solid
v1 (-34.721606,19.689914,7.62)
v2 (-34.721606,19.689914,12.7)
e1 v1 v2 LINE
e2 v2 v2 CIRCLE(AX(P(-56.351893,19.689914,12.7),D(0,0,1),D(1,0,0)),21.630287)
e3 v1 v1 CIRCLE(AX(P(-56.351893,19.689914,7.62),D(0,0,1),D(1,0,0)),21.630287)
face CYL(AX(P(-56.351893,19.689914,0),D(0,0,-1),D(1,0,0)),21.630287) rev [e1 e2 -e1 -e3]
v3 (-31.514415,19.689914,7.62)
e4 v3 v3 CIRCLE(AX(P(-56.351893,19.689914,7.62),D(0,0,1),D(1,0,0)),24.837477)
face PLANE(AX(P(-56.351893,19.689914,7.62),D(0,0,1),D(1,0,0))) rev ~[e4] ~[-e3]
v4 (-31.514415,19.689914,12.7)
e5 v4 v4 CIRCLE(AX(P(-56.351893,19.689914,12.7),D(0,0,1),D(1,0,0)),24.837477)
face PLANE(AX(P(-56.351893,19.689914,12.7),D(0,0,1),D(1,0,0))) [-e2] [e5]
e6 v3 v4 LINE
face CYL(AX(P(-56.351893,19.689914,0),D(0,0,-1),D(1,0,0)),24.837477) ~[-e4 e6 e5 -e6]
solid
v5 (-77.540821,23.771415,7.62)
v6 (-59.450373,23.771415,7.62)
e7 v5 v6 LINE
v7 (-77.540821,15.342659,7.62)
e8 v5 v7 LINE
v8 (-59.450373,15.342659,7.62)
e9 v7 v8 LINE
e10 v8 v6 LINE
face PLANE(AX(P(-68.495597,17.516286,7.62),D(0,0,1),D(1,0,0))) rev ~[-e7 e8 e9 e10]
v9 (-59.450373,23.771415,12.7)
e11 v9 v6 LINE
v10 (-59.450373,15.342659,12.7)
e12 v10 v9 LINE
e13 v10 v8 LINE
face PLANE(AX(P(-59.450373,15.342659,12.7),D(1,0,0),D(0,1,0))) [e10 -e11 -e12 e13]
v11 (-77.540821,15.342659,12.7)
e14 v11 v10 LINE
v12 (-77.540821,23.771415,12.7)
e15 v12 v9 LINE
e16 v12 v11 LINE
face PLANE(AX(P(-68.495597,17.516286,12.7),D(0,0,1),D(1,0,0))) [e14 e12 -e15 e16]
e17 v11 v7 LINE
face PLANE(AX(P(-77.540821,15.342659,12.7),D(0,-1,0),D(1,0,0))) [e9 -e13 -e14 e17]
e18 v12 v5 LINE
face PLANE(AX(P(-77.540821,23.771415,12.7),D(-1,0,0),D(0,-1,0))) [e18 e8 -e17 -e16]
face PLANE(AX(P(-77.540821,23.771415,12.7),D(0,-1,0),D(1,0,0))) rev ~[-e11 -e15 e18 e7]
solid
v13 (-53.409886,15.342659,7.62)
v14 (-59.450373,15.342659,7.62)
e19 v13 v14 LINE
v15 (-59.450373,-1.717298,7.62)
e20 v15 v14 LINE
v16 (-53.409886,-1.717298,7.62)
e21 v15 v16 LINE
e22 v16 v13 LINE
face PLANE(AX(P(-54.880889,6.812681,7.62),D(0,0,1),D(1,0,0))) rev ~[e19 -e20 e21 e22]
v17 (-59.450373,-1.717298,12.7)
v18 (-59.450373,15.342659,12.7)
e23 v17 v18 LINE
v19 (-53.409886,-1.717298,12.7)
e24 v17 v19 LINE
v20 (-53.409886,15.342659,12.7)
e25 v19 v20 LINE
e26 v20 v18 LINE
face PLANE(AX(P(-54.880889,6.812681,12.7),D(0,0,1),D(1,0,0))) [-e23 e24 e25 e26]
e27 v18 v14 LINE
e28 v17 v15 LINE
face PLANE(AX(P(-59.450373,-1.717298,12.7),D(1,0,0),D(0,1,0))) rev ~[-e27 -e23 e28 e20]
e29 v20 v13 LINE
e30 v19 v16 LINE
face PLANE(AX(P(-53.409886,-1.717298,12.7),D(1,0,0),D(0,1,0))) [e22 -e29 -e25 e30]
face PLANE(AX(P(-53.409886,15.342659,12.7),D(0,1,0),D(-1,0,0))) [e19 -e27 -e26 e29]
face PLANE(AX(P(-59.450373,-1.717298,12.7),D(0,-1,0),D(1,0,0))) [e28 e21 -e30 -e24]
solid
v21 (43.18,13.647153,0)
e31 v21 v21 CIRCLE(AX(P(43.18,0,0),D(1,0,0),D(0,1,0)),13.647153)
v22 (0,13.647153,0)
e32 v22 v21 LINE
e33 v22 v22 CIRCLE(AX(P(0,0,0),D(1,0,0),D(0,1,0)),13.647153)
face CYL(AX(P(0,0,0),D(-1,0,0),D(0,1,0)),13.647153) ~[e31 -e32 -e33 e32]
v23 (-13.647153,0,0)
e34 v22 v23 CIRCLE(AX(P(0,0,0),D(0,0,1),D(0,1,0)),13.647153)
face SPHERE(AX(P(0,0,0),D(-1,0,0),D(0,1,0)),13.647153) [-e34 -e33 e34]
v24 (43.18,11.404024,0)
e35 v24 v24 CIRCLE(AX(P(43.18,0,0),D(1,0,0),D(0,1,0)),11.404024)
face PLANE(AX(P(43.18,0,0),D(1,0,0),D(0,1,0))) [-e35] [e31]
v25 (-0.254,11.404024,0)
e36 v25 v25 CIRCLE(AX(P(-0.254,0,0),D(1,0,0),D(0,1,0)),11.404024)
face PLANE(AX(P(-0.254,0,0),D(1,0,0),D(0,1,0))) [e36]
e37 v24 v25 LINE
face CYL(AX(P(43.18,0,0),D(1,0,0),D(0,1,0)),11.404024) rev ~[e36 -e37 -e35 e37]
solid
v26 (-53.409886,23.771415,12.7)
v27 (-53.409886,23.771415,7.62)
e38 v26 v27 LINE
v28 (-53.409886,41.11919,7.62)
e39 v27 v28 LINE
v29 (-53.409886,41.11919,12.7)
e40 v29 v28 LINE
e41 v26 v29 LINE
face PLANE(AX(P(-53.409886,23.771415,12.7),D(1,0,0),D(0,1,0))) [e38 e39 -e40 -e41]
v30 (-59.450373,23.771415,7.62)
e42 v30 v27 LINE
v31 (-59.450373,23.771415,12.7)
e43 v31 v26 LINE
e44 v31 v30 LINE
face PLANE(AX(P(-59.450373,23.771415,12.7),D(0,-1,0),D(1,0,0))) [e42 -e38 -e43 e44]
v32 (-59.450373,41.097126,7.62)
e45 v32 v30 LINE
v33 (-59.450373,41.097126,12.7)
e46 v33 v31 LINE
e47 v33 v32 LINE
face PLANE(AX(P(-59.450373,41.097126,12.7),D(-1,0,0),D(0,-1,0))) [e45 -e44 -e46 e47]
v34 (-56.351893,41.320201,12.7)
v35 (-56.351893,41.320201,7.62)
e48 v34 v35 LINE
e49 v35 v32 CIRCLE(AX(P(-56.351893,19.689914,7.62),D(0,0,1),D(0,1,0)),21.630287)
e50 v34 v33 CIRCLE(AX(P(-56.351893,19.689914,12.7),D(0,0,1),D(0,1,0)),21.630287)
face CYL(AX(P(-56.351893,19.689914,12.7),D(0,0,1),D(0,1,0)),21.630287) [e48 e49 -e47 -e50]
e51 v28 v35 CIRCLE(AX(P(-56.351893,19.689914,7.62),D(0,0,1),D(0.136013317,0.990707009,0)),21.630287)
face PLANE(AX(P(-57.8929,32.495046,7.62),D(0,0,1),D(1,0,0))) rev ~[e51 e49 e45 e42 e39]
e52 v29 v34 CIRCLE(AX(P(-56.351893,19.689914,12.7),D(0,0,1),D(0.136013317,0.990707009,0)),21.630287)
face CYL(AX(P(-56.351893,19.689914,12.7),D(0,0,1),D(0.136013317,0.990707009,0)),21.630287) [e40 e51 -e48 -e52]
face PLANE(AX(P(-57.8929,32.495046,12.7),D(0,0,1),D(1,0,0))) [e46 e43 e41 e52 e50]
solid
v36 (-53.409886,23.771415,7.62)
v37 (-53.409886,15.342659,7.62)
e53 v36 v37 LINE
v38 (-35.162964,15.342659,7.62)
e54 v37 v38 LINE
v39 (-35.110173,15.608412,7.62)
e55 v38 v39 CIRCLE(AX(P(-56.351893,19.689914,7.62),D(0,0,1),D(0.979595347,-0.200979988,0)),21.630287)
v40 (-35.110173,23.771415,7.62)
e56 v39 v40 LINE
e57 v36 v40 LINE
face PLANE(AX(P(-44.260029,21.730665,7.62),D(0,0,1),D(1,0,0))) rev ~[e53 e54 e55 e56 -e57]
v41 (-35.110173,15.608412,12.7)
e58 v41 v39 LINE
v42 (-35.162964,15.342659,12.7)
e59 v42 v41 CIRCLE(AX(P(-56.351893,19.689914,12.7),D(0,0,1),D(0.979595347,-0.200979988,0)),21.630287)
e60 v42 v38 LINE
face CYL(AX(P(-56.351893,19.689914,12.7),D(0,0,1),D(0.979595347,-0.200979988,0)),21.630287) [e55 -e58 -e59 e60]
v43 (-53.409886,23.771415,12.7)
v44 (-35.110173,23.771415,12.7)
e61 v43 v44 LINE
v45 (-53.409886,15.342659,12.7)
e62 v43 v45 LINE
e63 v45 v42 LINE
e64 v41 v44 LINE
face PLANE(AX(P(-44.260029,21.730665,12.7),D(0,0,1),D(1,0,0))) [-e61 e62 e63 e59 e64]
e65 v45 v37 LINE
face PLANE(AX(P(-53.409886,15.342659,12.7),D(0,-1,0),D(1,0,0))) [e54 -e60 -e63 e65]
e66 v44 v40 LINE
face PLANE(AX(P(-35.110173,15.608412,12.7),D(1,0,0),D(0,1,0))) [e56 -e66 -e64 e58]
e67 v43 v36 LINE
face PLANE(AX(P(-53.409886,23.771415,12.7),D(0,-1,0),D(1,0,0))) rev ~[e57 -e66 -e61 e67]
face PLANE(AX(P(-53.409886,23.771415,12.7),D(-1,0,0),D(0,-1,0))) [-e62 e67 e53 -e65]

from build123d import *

# Parameters (mm, degrees)
F0_R      = 13.64715261
F1_DEPTH  = 43.18
F4_R      = 11.4040237501
F5_DEPTH  = 43.434
F6_R      = 24.8374772397
F6_R_2    = 21.6302866644
F7_DEPTH  = 12.7
F9_DEPTH  = 5.08
F8_W      = 2.942007035
F8_H      = 17.0599571333
F8_W_2    = 3.09848026
F8_W_3    = 18.0904479147
F8_H_2    = 4.3472547651
F8_H_3    = 4.0815014616
F8_W_4    = 18.2997124576
F10_DEPTH = 7.62


with BuildPart() as f1:
    # F0 (on Right) → F1 (new body)
    with BuildSketch(Plane.YZ):
        Circle(F0_R)
    extrude(amount=F1_DEPTH)

    # F2 (on Top) → F3 (revolve)
    with BuildSketch(Plane.XY):
        with BuildLine():
            Line((0, 0), (0, 13.64715261))
            ThreePointArc((0, 13.64715261), (-9.6499941544, 9.6499941544), (-13.64715261, 0))
            Line((-13.64715261, 0), (0, 0))
        make_face()
    revolve(axis=Axis((-6.823576305, 0, 0), (-1, 0, 0)))

    # F4 (on face) → F5 (cut)
    with BuildSketch(Plane.YZ.offset(43.18)):
        Circle(F4_R)
    extrude(amount=-F5_DEPTH, mode=Mode.SUBTRACT)


with BuildPart() as f7:
    # F6 (on Top) → F7 (new body)
    with BuildSketch(Plane.XY):
        with Locations((-56.3518926501, 19.6899138391)):
            Circle(F6_R)
        with Locations((-56.3518926501, 19.6899138391)):
            Circle(F6_R_2, mode=Mode.SUBTRACT)
    extrude(amount=F7_DEPTH)

    # F10 (cut): a face of the model
    f10_faces = [f7.faces().sort_by_distance(p)[0] for p in [
        (-80.4868599465, 19.6899138391, 0),
    ]]
    extrude(f10_faces, amount=-F10_DEPTH, mode=Mode.SUBTRACT)


with BuildPart() as f9:
    # F8 (on face) → F9 (new body)
    with BuildSketch(Plane.XY.offset(12.7)):
        with BuildLine():
            Line((-59.4503729101, 23.7714153007), (-56.3518926501, 23.7714153007))
            Line((-56.3518926501, 23.7714153007), (-56.3518926501, 41.3202005035))
            ThreePointArc((-56.3518926501, 41.3202005035), (-57.9051426519, 41.2643597327), (-59.4503729101, 41.0971257375))
            Line((-59.4503729101, 41.0971257375), (-59.4503729101, 23.7714153007))
        make_face()
        with BuildLine():
            Line((-56.3518926501, 41.3202005035), (-56.3518926501, 23.7714153007))
            Line((-56.3518926501, 23.7714153007), (-53.4098856151, 23.7714153007))
            Line((-53.4098856151, 23.7714153007), (-53.4098856151, 41.1191904436))
            ThreePointArc((-53.4098856151, 41.1191904436), (-54.8774596711, 41.269889478), (-56.3518926501, 41.3202005035))
        make_face()
    extrude(amount=-F9_DEPTH)


with BuildPart() as f9b:
    # F8 (on face) → F9, piece 2 (new body)
    with BuildSketch(Plane.XY.offset(12.7)):
        with Locations((-54.8808891326, 6.8126805073)):
            Rectangle(F8_W, F8_H)
        with Locations((-57.9011327801, 6.8126805073)):
            Rectangle(F8_W_2, F8_H)
    extrude(amount=-F9_DEPTH)


with BuildPart() as f9c:
    # F8 (on face) → F9, piece 3 (new body)
    with BuildSketch(Plane.XY.offset(12.7)):
        with Locations((-68.4955968675, 17.5162864565)):
            Rectangle(F8_W_3, F8_H_2)
        with Locations((-68.4955968675, 21.7306645699)):
            Rectangle(F8_W_3, F8_H_3)
    extrude(amount=-F9_DEPTH)


with BuildPart() as f9d:
    # F8 (on face) → F9, piece 4 (new body)
    with BuildSketch(Plane.XY.offset(12.7)):
        with Locations((-44.2600293863, 21.7306645699)):
            Rectangle(F8_W_4, F8_H_3)
        with BuildLine():
            Line((-35.1101731575, 19.6899138391), (-53.4098856151, 19.6899138391))
            Line((-53.4098856151, 19.6899138391), (-53.4098856151, 15.342659074))
            Line((-53.4098856151, 15.342659074), (-35.1629644754, 15.342659074))
            ThreePointArc((-35.1629644754, 15.342659074), (-35.1361527014, 15.4754530654), (-35.1101731575, 15.6084123775))
            Line((-35.1101731575, 15.6084123775), (-35.1101731575, 19.6899138391))
        make_face()
    extrude(amount=-F9_DEPTH)


solid = Compound([f1.part, f7.part, f9.part, f9b.part, f9c.part, f9d.part])
